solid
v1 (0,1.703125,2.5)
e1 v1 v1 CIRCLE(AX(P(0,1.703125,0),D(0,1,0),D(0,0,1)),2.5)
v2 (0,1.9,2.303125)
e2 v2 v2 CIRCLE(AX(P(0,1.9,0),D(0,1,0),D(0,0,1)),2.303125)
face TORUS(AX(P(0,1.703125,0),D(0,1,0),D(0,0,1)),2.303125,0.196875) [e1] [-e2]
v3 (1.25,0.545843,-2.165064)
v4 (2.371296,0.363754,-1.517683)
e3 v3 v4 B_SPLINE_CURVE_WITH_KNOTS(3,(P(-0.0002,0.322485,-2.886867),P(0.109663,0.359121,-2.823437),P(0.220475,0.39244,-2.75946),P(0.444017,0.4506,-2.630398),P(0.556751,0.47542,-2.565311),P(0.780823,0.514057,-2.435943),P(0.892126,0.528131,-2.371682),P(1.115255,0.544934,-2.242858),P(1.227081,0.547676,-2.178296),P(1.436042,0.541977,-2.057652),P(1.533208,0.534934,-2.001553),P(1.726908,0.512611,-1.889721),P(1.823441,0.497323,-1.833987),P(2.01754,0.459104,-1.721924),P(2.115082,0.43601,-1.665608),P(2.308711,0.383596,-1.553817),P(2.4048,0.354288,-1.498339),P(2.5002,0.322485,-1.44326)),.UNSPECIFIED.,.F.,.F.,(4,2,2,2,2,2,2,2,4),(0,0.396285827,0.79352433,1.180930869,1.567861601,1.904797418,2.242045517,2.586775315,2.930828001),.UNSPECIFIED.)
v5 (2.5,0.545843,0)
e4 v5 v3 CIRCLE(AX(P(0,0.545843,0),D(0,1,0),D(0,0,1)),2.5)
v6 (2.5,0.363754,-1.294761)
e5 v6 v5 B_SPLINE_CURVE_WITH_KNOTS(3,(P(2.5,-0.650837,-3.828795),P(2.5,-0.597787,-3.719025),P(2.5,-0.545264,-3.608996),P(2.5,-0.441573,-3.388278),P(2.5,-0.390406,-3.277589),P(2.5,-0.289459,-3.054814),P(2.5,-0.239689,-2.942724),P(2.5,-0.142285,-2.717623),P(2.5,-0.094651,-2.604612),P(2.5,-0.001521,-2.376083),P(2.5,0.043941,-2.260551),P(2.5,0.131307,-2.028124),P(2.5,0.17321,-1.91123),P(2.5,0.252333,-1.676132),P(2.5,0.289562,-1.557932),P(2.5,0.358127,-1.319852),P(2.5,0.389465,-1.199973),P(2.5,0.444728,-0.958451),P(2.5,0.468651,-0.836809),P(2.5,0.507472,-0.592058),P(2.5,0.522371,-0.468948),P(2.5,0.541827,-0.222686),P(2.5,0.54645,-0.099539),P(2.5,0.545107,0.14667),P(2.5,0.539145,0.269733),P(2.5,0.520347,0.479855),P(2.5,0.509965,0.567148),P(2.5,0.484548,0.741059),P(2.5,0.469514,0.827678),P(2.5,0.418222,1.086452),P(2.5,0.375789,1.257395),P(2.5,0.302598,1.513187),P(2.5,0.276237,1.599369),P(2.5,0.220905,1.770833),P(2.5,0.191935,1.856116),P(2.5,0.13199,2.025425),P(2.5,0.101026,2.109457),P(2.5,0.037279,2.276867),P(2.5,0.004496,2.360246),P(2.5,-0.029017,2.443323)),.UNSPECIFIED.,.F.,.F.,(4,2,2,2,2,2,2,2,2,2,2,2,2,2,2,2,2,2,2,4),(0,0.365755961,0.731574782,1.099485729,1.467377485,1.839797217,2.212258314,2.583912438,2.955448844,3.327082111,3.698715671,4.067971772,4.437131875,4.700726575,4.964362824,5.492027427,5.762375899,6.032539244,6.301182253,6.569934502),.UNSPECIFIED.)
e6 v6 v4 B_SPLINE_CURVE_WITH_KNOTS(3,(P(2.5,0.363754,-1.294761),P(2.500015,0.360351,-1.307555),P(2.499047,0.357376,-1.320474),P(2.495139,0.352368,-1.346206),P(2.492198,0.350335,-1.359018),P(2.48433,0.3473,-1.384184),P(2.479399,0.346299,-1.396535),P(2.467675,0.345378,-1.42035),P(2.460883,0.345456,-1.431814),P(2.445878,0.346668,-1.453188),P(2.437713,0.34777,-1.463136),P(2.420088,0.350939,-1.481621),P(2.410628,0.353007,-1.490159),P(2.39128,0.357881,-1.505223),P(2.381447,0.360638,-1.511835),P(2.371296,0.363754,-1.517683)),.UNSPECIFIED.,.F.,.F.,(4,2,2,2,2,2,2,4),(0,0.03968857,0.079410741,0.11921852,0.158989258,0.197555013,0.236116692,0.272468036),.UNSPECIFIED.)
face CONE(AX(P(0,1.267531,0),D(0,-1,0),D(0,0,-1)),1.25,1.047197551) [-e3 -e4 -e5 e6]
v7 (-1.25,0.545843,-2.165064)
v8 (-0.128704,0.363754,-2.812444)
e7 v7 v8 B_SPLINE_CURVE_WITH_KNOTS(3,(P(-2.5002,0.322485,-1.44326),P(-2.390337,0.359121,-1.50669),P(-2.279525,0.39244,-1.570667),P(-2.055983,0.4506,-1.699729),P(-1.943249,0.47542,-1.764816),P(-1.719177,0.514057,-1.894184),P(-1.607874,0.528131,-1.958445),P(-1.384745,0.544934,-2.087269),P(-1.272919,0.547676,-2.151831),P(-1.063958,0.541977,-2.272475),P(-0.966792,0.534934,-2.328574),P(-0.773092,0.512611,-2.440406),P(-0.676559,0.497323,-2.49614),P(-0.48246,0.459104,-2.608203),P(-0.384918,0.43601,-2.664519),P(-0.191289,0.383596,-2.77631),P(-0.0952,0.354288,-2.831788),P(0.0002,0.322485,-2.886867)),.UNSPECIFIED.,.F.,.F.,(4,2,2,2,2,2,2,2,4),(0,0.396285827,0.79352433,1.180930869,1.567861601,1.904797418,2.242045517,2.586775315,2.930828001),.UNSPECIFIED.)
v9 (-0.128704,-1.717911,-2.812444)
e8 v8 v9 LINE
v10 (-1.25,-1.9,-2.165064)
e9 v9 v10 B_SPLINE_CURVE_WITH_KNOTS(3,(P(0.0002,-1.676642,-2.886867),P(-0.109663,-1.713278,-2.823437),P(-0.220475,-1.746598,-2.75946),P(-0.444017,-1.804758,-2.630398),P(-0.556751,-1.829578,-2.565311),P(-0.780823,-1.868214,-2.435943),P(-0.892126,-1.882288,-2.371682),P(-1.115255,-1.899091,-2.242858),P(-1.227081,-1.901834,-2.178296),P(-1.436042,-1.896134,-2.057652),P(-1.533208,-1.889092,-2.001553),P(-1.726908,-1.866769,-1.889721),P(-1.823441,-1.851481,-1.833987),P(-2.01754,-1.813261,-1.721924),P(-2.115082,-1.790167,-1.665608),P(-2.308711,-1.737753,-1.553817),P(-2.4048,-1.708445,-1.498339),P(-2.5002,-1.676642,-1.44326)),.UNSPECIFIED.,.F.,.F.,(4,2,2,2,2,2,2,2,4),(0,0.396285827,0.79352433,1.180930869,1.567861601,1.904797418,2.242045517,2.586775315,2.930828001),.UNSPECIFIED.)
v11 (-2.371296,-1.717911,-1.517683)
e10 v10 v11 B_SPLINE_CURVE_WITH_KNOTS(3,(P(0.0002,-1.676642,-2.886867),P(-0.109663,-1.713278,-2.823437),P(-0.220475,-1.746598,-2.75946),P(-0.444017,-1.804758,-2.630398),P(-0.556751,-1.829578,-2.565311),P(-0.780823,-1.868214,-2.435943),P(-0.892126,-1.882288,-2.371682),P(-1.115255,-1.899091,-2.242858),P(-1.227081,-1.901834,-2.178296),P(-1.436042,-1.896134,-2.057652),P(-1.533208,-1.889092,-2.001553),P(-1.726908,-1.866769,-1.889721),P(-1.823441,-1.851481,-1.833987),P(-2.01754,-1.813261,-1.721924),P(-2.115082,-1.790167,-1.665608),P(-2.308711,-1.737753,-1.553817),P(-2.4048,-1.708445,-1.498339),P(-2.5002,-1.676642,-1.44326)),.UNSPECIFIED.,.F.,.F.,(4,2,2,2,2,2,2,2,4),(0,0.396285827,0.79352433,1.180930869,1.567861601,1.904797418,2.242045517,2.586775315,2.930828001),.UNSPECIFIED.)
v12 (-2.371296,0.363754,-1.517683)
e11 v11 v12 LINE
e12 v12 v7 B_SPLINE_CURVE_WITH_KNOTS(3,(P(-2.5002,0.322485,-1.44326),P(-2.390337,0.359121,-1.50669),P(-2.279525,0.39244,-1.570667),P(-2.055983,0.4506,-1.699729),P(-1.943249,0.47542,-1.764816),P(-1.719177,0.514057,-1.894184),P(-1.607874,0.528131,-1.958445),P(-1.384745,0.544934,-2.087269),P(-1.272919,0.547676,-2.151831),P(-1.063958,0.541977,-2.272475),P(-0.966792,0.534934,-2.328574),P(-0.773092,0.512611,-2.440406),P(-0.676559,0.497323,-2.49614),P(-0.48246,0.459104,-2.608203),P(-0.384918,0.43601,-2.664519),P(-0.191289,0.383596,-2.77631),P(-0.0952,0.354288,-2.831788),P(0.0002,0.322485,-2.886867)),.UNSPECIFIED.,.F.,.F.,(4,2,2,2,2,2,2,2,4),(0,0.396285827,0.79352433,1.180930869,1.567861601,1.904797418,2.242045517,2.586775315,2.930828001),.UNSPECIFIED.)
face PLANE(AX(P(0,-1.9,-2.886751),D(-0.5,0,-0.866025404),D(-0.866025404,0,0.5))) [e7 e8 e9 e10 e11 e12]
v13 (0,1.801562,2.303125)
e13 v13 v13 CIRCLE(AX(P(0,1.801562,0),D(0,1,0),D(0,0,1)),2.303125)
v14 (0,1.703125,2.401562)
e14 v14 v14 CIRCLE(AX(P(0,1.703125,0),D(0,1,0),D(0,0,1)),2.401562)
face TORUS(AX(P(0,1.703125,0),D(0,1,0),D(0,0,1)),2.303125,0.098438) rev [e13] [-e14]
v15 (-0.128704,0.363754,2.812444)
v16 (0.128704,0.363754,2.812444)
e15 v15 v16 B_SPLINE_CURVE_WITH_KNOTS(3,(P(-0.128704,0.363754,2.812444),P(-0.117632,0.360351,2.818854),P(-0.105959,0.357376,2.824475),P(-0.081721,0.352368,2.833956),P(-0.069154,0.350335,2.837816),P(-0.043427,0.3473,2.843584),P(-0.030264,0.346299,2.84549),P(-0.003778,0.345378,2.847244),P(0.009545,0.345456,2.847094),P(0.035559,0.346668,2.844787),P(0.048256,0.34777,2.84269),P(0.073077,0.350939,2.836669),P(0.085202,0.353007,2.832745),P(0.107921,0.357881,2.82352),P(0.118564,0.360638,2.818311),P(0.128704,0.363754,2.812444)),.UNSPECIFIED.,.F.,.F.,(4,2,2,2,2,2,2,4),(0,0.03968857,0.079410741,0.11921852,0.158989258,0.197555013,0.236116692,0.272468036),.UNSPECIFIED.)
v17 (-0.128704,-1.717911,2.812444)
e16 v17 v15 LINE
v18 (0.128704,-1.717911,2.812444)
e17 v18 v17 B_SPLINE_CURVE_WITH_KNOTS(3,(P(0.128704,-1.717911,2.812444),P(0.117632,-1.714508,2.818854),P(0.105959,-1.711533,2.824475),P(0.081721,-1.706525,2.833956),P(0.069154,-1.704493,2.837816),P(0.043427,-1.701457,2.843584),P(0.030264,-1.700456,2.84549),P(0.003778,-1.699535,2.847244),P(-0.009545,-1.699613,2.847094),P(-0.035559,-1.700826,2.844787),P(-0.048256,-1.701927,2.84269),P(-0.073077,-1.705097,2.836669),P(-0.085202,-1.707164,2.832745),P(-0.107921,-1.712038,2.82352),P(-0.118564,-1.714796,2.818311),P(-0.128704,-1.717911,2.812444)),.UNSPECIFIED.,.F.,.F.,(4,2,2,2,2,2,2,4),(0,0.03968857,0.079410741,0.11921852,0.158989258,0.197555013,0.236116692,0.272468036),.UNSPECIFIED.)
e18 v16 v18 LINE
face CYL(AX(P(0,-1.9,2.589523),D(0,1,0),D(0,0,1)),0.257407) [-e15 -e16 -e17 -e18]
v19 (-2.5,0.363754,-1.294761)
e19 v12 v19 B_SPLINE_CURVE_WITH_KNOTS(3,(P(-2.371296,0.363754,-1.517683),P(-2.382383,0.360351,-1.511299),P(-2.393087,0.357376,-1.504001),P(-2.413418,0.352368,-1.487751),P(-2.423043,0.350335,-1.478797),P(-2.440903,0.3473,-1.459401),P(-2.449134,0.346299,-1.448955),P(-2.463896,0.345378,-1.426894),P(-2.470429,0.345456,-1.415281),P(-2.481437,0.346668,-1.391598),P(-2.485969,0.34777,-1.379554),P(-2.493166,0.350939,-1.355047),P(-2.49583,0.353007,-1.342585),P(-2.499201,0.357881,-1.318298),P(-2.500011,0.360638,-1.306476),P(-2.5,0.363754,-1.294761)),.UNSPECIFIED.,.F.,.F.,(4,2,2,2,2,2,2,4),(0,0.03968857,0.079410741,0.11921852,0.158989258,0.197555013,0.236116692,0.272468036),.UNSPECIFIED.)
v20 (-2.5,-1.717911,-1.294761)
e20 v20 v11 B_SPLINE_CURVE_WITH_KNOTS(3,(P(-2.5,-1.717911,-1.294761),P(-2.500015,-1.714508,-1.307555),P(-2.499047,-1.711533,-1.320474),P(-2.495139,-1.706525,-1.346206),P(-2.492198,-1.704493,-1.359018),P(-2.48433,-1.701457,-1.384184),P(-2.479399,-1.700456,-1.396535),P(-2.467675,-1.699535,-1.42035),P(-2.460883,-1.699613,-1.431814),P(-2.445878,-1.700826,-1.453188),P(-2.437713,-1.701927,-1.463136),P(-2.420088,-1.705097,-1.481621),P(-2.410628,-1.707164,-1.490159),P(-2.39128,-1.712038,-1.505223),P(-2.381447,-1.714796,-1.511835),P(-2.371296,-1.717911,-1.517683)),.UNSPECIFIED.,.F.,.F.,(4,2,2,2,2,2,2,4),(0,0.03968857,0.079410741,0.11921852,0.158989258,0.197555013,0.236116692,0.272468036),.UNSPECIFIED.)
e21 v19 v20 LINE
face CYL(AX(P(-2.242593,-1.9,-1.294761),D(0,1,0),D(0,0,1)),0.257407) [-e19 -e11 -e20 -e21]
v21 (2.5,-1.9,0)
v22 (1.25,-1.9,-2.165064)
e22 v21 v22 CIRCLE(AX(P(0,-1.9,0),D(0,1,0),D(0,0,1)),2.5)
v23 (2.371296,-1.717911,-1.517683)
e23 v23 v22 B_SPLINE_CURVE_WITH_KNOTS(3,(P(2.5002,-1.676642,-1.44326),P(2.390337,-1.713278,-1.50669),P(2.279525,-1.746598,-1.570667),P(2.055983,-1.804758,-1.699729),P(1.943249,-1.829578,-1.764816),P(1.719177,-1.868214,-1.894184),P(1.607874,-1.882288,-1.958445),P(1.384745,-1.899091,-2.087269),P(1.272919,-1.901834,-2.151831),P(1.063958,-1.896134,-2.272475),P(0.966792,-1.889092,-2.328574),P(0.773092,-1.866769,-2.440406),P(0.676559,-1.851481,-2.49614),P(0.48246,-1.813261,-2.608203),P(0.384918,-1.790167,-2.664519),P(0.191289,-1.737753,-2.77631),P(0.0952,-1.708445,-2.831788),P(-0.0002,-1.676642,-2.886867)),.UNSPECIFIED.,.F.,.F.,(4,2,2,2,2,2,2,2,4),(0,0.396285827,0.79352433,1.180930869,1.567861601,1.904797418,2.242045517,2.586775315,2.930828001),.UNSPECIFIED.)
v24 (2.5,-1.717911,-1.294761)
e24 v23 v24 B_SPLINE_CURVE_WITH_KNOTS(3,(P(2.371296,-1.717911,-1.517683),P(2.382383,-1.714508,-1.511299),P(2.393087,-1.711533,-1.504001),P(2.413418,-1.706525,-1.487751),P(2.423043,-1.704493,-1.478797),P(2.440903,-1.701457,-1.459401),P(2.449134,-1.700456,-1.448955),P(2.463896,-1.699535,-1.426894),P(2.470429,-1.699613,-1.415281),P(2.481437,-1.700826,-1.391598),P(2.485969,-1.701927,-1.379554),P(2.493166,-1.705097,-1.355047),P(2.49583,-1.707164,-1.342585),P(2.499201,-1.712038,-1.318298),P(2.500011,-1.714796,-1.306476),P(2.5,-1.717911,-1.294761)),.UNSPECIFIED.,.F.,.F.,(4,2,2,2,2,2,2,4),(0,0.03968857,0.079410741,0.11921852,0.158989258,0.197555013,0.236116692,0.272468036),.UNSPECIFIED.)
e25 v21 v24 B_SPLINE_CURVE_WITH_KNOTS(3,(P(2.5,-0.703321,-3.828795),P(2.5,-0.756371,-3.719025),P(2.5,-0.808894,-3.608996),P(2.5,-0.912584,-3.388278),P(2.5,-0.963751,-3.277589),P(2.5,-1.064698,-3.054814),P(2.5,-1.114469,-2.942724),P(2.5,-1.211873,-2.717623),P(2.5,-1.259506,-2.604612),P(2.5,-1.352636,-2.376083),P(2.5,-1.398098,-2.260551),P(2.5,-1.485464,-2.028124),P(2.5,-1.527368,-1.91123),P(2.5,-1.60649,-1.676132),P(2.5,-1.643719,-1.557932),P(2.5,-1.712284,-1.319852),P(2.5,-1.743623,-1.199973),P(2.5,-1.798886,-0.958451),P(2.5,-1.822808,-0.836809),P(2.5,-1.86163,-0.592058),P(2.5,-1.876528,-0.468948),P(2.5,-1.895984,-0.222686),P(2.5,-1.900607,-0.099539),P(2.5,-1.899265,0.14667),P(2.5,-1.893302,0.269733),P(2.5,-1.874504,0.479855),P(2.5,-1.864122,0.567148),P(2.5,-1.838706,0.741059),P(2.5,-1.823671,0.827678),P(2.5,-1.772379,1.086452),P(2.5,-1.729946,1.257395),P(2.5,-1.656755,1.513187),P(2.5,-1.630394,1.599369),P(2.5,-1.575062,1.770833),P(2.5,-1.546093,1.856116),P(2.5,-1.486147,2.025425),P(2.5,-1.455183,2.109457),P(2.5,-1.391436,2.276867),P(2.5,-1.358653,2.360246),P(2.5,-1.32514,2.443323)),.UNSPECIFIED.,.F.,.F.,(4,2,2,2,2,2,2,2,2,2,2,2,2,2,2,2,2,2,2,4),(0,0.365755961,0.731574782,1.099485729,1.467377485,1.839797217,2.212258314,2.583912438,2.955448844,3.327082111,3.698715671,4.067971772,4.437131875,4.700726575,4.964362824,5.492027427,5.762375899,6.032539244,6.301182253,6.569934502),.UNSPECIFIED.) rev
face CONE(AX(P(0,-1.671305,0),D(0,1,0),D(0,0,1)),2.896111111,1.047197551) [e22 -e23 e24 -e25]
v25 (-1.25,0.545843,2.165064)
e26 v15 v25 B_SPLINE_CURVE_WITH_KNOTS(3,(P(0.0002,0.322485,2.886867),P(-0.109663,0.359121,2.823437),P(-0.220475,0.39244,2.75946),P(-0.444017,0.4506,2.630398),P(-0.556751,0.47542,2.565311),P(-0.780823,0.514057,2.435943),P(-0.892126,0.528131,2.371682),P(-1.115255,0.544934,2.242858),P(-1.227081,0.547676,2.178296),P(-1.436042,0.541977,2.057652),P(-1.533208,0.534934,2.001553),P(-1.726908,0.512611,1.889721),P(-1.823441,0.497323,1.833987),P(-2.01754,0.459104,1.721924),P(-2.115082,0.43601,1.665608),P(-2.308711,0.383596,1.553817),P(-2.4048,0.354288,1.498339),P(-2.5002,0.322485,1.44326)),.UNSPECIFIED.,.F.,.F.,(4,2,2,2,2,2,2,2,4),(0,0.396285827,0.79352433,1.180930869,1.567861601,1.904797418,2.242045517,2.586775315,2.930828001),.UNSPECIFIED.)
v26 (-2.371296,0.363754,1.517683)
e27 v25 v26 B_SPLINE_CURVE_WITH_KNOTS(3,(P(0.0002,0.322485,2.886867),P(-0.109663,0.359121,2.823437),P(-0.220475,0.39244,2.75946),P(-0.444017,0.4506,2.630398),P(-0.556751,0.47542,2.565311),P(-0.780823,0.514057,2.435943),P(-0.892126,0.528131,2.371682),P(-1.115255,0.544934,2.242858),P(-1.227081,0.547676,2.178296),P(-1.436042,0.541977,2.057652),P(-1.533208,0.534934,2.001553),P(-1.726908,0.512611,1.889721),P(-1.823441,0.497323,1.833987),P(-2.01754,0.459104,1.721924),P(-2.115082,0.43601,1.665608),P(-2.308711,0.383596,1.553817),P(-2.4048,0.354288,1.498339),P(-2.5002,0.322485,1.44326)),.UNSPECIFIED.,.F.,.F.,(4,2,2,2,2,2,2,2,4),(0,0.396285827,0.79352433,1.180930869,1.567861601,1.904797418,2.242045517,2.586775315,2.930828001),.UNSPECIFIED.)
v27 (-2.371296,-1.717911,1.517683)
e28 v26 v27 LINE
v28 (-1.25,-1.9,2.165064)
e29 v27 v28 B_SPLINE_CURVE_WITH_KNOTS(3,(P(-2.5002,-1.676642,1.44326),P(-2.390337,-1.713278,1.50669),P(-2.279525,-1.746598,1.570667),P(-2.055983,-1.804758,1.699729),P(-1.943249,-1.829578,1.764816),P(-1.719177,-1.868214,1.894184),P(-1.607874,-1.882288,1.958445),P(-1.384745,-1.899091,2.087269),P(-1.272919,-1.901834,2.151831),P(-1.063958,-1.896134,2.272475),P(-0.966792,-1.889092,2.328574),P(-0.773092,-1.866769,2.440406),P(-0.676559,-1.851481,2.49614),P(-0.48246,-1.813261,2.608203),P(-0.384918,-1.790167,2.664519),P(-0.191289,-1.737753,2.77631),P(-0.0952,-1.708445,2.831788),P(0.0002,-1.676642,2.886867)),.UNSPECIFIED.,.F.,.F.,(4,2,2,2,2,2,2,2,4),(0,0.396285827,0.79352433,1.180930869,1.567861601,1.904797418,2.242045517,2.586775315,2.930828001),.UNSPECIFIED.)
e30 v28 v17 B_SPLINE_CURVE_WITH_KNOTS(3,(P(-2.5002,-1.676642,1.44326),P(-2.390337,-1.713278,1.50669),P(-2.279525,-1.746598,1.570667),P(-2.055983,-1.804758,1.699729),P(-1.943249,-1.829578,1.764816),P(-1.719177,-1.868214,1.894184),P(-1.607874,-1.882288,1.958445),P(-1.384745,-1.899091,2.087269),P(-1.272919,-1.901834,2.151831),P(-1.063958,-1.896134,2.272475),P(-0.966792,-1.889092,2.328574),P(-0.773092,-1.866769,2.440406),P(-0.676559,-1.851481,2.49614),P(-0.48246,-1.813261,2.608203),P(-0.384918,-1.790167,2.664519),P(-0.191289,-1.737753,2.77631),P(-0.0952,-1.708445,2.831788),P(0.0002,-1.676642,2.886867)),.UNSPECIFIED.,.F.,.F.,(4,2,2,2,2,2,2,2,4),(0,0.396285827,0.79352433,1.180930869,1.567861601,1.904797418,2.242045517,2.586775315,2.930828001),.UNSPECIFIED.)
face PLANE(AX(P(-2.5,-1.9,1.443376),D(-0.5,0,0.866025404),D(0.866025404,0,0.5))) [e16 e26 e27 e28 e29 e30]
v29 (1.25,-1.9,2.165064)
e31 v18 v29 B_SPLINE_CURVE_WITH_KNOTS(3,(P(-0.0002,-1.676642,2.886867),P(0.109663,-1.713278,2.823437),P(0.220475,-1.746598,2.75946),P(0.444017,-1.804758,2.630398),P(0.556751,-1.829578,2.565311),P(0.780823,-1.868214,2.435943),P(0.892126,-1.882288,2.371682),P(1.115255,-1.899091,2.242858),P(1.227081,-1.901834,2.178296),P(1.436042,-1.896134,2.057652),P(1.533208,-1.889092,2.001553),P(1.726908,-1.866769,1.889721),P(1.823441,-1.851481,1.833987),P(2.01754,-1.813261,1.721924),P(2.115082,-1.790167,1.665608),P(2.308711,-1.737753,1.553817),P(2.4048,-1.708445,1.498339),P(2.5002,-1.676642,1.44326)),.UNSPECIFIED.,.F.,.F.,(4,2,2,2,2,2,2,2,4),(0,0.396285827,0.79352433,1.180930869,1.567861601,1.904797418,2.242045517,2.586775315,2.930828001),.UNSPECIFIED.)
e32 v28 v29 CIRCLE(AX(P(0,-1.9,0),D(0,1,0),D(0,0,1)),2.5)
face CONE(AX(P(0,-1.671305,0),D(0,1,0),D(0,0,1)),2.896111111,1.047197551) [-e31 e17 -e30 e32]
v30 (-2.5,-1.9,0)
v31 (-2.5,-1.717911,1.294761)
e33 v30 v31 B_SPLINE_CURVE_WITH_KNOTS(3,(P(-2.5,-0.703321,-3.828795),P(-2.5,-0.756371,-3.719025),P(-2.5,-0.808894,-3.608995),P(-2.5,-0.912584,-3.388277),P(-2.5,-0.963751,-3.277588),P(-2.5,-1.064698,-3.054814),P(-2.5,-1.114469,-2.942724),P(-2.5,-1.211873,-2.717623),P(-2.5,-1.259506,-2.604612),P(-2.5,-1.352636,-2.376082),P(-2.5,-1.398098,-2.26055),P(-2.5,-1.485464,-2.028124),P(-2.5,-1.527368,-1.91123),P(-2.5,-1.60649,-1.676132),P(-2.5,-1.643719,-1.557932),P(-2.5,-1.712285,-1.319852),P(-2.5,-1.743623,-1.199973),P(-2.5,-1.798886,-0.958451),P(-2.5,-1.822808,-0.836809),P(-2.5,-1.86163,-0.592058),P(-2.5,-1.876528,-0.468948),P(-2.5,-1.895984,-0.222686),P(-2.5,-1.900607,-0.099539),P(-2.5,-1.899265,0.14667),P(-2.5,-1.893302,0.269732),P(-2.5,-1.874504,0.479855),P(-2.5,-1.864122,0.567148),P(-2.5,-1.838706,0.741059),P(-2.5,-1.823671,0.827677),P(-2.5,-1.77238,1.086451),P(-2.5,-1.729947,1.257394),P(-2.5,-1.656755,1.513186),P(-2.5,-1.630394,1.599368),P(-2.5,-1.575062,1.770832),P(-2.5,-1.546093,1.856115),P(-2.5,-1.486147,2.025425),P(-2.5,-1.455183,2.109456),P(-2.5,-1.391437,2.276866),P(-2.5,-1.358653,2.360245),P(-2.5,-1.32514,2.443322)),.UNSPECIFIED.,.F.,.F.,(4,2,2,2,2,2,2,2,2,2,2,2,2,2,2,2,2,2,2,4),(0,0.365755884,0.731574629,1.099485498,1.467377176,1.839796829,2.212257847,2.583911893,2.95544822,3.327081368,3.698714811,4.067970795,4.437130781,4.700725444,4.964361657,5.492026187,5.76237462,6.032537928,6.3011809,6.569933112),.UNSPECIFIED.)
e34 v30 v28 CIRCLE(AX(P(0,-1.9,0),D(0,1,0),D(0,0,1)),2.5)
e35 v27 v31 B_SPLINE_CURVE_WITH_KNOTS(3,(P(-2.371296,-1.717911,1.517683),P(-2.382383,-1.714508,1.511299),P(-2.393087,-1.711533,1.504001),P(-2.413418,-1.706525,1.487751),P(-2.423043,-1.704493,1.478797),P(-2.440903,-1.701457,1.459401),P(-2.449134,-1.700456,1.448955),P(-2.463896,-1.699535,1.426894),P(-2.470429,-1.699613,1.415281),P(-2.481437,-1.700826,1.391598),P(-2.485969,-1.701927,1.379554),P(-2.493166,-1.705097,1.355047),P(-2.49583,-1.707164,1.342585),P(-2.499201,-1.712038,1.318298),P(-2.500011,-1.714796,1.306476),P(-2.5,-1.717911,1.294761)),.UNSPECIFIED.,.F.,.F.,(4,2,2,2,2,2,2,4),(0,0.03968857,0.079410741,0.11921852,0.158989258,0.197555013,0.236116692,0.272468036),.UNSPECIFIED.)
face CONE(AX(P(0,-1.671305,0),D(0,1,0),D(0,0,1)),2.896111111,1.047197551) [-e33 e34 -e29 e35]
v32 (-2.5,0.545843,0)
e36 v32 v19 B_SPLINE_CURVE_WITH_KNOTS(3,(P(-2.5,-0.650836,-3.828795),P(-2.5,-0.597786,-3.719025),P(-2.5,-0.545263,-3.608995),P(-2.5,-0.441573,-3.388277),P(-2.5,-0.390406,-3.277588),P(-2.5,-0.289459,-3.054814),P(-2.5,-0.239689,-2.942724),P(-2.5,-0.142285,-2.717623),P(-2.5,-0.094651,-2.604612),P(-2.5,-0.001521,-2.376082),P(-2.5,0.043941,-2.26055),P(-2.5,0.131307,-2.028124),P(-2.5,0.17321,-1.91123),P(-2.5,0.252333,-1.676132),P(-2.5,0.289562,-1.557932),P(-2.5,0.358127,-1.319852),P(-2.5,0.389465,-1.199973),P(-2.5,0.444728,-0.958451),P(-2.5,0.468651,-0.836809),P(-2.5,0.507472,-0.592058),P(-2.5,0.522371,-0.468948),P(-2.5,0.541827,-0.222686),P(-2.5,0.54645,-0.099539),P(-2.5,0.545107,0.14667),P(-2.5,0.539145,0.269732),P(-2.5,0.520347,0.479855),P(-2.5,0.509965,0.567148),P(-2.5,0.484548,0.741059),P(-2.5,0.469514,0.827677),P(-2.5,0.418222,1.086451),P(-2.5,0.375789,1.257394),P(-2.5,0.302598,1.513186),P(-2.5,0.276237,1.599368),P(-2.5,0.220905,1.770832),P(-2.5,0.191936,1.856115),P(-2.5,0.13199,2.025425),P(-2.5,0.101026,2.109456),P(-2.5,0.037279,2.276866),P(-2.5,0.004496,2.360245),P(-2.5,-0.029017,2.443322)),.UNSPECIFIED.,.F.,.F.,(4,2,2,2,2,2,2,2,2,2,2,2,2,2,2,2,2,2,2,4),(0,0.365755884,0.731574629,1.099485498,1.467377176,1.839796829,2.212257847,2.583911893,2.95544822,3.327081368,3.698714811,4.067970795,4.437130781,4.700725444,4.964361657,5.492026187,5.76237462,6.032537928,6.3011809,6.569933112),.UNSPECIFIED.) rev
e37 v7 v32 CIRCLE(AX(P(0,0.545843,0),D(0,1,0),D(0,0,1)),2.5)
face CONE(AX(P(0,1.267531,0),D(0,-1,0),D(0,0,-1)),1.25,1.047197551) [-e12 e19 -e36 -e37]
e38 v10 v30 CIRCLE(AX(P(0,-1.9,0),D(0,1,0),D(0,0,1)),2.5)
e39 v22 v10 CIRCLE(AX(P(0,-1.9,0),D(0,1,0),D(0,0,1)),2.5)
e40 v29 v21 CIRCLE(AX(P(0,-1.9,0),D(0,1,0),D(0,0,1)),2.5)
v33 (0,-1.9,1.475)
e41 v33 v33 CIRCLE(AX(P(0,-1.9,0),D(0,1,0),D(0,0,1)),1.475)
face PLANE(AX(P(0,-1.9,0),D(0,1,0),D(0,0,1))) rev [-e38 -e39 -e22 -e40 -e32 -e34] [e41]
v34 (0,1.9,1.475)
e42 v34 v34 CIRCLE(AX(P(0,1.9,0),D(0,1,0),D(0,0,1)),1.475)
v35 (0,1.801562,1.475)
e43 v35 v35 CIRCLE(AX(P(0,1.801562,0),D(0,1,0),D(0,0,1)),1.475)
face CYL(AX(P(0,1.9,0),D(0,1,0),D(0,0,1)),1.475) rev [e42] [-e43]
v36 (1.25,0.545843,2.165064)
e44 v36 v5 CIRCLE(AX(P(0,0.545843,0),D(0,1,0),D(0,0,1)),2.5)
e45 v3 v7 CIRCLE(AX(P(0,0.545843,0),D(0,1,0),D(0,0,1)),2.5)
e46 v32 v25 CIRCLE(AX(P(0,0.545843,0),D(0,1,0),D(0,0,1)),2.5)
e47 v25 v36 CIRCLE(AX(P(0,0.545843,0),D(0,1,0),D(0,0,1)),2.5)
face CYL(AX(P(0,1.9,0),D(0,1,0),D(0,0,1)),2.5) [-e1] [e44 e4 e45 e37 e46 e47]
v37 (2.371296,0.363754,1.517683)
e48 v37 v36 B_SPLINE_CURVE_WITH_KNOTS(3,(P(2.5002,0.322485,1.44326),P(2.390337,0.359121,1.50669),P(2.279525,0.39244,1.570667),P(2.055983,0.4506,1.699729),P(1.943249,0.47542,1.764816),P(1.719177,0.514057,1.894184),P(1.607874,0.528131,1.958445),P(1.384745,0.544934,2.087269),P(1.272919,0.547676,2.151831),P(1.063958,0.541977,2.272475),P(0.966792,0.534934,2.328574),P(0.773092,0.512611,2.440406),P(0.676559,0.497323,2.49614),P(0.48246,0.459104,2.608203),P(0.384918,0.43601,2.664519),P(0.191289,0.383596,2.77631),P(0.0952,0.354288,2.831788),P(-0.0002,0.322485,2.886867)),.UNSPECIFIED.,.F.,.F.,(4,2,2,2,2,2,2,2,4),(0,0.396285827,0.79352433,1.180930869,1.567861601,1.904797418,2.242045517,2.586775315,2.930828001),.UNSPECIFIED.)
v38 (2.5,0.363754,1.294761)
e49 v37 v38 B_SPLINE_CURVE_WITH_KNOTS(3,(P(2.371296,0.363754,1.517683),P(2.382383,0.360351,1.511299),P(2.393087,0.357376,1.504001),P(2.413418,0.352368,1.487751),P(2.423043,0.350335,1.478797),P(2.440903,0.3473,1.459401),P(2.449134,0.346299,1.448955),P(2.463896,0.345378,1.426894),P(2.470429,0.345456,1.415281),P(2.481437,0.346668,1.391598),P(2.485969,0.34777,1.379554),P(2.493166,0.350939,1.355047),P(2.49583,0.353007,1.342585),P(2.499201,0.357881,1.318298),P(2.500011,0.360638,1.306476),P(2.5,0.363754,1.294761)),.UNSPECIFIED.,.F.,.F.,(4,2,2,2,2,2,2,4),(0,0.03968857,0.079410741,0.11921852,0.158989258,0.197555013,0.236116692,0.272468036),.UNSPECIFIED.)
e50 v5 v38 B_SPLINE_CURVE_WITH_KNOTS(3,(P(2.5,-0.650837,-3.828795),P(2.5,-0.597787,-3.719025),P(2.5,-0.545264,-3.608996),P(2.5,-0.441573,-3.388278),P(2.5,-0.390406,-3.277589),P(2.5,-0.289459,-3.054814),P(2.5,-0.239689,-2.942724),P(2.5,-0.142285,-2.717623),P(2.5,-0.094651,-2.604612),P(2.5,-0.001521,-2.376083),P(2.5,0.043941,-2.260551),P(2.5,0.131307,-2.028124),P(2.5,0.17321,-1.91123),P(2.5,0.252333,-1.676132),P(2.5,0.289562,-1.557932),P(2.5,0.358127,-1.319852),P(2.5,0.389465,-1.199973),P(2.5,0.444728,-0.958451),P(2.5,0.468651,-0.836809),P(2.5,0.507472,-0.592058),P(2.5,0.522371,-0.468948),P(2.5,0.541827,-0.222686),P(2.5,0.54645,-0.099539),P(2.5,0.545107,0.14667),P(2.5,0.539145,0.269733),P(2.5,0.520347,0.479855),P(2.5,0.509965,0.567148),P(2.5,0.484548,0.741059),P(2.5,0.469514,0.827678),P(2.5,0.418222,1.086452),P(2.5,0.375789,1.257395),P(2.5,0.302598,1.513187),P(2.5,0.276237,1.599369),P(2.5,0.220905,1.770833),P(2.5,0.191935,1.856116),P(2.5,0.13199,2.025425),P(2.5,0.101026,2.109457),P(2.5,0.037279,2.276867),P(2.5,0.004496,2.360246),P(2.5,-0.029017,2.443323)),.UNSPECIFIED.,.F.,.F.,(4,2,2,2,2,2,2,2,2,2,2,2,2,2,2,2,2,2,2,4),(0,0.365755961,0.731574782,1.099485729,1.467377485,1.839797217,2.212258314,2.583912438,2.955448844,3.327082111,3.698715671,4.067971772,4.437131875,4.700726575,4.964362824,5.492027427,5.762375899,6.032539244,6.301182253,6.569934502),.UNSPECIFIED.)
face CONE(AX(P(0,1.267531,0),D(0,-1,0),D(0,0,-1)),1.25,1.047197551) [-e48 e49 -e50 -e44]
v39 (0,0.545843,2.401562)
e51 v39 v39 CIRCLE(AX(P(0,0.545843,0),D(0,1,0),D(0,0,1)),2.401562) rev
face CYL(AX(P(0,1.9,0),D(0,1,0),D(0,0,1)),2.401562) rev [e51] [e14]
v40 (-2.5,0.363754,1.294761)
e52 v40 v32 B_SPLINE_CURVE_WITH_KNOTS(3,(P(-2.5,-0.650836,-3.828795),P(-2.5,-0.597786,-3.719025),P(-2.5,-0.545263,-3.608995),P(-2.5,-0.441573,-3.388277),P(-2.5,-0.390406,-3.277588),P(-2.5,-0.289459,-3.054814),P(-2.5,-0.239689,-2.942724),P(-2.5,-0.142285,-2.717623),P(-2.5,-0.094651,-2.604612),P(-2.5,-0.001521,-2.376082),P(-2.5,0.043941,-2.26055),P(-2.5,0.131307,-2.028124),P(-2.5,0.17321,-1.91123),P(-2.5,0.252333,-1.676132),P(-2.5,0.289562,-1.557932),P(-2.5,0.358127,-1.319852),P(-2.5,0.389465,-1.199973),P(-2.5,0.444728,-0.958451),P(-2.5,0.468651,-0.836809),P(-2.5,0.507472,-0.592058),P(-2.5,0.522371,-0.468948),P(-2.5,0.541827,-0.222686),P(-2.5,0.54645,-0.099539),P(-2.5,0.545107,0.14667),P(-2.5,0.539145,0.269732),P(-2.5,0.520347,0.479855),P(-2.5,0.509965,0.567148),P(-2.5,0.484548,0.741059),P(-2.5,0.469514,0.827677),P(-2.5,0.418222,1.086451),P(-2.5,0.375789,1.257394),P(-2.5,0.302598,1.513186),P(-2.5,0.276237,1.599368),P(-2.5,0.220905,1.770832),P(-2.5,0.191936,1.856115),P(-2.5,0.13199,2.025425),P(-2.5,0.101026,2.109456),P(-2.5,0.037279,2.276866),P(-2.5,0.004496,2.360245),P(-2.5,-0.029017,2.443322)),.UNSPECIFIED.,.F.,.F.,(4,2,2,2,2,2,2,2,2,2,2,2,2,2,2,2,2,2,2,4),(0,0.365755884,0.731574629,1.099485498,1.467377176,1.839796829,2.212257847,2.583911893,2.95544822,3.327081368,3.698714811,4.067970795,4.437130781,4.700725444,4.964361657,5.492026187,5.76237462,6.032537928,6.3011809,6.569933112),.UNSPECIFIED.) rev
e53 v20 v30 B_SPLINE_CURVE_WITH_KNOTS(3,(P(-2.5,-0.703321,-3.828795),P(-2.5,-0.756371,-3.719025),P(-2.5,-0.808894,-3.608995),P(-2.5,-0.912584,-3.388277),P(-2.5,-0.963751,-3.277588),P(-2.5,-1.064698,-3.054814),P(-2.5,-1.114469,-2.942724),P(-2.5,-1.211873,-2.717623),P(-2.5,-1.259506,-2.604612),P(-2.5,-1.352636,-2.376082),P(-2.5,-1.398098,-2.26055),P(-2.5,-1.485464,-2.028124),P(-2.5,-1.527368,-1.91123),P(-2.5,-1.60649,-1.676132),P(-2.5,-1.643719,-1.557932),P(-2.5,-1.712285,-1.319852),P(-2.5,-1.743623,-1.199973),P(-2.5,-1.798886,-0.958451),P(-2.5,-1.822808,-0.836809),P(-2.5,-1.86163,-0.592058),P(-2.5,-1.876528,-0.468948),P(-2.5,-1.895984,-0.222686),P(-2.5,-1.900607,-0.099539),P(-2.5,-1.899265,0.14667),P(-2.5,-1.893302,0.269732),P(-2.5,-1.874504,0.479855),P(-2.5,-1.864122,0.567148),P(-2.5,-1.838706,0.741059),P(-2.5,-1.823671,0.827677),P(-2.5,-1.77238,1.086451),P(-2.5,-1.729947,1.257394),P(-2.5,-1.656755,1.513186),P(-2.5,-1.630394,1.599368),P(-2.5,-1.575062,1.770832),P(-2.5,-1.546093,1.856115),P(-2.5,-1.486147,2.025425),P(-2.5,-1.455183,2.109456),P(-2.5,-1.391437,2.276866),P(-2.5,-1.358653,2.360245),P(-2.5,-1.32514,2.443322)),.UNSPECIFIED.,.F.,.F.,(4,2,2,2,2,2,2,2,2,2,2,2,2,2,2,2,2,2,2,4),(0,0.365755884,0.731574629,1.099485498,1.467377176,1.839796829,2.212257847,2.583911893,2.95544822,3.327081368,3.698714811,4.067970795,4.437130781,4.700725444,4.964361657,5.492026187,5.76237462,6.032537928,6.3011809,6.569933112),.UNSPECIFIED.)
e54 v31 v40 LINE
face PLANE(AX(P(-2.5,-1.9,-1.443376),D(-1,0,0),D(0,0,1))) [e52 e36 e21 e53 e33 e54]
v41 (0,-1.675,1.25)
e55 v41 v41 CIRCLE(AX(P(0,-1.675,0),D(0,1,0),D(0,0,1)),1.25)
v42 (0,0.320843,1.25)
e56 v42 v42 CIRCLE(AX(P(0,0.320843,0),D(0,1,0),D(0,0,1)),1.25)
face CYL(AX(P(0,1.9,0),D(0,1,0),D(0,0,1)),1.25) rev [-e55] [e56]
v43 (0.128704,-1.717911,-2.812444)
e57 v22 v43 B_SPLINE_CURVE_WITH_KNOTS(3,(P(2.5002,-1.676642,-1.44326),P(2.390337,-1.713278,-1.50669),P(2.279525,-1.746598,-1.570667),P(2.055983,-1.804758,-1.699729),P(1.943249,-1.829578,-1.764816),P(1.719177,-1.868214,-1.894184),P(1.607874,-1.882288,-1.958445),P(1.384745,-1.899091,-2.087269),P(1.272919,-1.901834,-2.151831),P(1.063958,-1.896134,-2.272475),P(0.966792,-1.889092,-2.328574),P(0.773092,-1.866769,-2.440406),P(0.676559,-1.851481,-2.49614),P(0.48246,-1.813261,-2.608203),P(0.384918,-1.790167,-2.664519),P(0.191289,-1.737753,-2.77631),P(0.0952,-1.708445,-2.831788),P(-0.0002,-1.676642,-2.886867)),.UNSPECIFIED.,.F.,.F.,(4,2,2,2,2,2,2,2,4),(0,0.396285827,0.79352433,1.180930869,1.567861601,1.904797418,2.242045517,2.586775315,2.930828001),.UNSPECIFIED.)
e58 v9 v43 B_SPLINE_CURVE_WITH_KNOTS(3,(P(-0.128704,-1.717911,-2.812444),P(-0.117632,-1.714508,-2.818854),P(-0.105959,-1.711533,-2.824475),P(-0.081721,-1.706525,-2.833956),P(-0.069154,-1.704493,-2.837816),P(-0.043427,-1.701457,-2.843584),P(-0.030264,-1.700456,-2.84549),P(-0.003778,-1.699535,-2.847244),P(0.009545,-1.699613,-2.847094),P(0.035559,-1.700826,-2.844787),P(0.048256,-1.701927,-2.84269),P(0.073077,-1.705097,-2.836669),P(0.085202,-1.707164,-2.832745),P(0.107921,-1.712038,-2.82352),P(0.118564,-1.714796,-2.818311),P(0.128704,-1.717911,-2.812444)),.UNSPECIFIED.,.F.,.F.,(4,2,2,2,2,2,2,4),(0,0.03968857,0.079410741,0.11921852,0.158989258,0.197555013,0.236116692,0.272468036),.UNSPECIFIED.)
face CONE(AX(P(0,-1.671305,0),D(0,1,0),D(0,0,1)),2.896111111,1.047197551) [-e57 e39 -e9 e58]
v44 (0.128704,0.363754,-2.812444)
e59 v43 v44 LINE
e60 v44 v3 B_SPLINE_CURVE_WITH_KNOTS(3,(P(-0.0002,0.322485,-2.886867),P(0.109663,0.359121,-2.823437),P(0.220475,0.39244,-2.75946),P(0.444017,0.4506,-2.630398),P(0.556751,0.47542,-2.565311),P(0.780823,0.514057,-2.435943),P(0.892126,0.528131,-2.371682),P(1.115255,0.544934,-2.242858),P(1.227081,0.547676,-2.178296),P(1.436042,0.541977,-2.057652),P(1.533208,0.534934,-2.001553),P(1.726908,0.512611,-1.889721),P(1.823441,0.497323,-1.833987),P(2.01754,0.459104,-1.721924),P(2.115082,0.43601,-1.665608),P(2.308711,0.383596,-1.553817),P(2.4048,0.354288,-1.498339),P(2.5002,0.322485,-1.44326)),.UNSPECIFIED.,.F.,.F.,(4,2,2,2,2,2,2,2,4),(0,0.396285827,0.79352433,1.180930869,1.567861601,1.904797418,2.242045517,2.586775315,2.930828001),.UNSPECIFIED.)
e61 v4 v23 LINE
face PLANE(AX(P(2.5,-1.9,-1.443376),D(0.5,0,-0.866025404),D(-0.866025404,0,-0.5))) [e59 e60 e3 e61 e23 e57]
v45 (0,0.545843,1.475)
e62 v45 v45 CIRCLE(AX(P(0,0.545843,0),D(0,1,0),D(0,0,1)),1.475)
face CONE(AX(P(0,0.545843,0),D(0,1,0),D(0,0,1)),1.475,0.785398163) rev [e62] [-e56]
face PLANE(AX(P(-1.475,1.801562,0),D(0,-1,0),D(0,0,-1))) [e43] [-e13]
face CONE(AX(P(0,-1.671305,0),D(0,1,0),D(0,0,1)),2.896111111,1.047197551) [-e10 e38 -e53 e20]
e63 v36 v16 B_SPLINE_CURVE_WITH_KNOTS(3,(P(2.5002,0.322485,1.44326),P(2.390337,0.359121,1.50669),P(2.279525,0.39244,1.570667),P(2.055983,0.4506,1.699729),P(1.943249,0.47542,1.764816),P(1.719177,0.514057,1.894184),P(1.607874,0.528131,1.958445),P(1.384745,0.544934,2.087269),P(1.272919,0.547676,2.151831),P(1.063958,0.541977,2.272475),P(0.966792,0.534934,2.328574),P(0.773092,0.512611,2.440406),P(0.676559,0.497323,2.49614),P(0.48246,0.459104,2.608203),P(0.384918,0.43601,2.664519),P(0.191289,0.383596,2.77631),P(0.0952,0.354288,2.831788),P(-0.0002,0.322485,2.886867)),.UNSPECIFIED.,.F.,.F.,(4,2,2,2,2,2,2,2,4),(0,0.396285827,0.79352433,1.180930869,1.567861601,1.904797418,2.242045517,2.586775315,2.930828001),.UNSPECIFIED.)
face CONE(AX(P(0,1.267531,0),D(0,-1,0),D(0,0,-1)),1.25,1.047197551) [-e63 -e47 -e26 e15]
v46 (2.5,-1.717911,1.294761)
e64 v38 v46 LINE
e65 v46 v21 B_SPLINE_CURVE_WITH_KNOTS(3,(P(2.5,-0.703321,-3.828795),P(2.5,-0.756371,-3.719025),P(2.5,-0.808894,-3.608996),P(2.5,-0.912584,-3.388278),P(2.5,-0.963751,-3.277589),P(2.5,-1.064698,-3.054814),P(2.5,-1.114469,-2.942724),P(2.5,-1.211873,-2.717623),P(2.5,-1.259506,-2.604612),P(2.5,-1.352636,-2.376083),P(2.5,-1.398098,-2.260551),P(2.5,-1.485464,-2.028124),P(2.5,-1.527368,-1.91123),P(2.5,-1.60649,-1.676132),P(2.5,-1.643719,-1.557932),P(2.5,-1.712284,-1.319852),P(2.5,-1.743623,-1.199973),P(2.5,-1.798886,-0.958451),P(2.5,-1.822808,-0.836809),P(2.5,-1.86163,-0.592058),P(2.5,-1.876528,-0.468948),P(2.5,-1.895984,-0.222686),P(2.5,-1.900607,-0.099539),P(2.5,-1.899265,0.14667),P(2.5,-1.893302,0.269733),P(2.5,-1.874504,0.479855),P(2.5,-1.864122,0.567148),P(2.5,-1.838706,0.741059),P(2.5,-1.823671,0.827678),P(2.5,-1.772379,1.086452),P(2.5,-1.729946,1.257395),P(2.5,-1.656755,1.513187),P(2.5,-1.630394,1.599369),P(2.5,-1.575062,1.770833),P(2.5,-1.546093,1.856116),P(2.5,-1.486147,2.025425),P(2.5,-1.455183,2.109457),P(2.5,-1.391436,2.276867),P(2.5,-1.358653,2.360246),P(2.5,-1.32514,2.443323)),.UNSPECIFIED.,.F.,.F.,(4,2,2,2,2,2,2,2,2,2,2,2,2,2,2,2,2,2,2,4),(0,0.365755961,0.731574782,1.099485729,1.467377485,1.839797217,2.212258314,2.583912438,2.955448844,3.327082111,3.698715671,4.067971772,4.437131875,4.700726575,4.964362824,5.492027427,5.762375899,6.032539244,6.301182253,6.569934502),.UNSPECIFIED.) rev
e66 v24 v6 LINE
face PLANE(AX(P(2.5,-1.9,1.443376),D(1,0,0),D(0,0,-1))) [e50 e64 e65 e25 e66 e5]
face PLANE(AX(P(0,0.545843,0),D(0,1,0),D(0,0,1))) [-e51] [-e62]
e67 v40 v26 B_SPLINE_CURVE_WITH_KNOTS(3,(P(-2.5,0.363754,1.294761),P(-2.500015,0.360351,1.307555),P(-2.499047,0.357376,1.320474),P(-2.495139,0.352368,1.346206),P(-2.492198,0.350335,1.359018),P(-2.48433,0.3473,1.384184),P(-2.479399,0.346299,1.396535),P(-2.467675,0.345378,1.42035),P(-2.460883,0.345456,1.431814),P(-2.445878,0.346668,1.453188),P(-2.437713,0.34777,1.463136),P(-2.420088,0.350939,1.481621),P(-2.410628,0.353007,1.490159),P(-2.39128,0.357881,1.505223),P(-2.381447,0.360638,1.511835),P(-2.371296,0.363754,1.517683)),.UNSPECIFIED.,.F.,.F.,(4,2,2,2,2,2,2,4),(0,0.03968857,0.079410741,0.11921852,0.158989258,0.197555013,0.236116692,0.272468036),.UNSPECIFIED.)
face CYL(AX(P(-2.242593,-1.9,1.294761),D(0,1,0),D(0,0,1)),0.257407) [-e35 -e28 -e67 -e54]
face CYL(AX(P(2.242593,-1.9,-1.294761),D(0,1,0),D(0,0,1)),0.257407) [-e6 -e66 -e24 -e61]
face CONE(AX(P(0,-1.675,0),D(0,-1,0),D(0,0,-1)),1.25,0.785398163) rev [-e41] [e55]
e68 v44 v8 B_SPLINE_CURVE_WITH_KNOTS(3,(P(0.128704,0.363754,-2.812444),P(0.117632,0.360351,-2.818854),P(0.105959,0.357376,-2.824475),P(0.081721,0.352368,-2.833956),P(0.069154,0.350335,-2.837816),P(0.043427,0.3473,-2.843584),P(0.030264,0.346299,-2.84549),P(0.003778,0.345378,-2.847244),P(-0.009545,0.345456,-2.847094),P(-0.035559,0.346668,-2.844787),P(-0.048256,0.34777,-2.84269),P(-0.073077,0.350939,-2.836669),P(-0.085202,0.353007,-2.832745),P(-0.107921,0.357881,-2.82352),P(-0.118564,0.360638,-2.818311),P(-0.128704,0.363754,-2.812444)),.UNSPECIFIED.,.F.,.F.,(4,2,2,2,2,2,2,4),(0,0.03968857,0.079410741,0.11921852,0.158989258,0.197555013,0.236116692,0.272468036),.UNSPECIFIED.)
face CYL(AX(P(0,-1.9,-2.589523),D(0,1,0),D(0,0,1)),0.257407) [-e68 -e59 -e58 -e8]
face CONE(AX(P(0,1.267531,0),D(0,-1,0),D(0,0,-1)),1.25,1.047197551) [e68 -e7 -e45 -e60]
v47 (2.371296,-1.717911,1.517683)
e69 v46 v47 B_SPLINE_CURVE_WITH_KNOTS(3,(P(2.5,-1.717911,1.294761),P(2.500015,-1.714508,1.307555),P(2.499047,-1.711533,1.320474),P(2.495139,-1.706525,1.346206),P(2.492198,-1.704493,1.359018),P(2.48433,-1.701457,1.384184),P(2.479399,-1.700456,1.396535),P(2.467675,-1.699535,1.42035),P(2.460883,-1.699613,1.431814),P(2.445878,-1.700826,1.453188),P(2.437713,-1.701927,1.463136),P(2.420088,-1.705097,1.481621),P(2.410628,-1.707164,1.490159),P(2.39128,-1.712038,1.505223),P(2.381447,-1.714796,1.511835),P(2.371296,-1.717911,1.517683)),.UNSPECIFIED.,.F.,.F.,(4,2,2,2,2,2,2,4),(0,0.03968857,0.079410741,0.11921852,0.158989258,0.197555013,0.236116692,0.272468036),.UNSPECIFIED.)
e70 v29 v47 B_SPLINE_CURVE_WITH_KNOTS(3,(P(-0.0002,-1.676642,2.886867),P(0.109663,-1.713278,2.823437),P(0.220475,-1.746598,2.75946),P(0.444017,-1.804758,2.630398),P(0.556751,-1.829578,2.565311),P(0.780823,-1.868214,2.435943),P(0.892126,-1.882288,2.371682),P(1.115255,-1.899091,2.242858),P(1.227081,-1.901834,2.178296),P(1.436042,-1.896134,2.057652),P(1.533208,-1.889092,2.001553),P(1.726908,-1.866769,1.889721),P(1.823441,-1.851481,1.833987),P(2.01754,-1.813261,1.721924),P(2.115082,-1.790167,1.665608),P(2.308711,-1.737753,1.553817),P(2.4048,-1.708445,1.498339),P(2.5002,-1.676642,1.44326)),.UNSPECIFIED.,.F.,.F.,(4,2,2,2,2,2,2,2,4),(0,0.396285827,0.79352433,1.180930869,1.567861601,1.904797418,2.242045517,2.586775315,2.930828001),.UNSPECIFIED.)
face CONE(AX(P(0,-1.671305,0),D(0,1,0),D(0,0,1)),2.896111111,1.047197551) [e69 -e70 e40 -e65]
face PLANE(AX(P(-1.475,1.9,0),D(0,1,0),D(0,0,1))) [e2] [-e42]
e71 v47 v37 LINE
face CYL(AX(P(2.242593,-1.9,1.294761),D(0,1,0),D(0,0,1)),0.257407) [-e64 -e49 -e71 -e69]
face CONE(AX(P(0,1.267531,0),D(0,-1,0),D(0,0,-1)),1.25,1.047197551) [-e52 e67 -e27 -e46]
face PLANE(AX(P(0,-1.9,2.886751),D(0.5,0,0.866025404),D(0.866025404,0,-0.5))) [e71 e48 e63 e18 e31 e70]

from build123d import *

# Parameters (mm, degrees)
BOSS_EXTRUDE1_START = 0.545843
BOSS_EXTRUDE1_DEPTH = 2.445843
FILLET1_R           = 0.257407407


with BuildPart() as part:
    # Sketch2 → Boss-Extrude1 (new body)
    with BuildSketch(Plane(origin=(0, 0, 0), x_dir=(1, 0, 0), z_dir=(0, 1, 0)).offset(BOSS_EXTRUDE1_START)):
        Polygon((2.5, 1.443375673), (0, 2.886751346), (-2.5, 1.443375673), (-2.5, -1.443375673), (0, -2.886751346), (2.5, -1.443375673), align=None)
    extrude(amount=-BOSS_EXTRUDE1_DEPTH)

    # Sketch3 → Cut-Revolve1 (revolve, cut)
    with BuildSketch(Plane.XY):
        Polygon((1.25, 1.267530544), (2.896111111, 0.317147851), (2.896111111, 1.267530544), align=None)
        Polygon((1.25, -2.621687836), (2.896111111, -1.671305143), (2.896111111, -2.621687836), align=None)
    revolve(axis=Axis((0, 1.9, 0), (0, -1, 0)), mode=Mode.SUBTRACT)

    # Fillet1
    fillet1_edges = [part.edges().sort_by_distance(p)[0] for p in [
        (-2.5, -0.677078646, -1.443375673),
        (-2.5, -0.677078646, 1.443375673),
        (0, -0.677078646, 2.886751346),
        (0, -0.677078646, -2.886751346),
        (2.5, -0.677078646, -1.443375673),
        (2.5, -0.677078646, 1.443375673),
    ]]
    fillet(fillet1_edges, radius=FILLET1_R)

    # Sketch5 → Cut-Revolve2 (revolve, cut)
    with BuildSketch(Plane.XY, mode=Mode.PRIVATE) as cut_revolve2_sk:
        Polygon((-1.475, -1.9), (-1.25, -1.675), (-1.25, 0.320842708), (-1.475, 0.545842708), (0, 0.545842708), (0, -1.9), align=None)
    revolve(cut_revolve2_sk.sketch.rotate(Axis((0, 1.9, 0), (0, -1, 0)), 270), axis=Axis((0, 1.9, 0), (0, -1, 0)), mode=Mode.SUBTRACT)


with BuildPart() as revolve1_tool:
    # Sketch4 → Revolve1 (revolve)
    with BuildSketch(Plane.XY):
        with BuildLine():
            Line((-1.475, 1.9), (-2.303125, 1.9))
            ThreePointArc((-2.303125, 1.9), (-2.442336648, 1.842336648), (-2.5, 1.703125))
            Line((-2.5, 1.703125), (-2.5, 0.545842708))
            Line((-2.5, 0.545842708), (-2.4015625, 0.545842708))
            Line((-2.4015625, 0.545842708), (-2.4015625, 1.703125))
            ThreePointArc((-2.4015625, 1.703125), (-2.372730824, 1.772730824), (-2.303125, 1.8015625))
            Line((-2.303125, 1.8015625), (-1.475, 1.8015625))
            Line((-1.475, 1.8015625), (-1.475, 1.9))
        make_face()
    revolve(axis=Axis((0, 1.9, 0), (0, -1, 0)))


with BuildPart() as part_1:
    add(part.part)


with BuildPart() as part_2:
    # Revolve1: joined with revolve1_tool
    add(part_1.part.fuse(revolve1_tool.part, tol=0.00001))


solid = part_2.part
